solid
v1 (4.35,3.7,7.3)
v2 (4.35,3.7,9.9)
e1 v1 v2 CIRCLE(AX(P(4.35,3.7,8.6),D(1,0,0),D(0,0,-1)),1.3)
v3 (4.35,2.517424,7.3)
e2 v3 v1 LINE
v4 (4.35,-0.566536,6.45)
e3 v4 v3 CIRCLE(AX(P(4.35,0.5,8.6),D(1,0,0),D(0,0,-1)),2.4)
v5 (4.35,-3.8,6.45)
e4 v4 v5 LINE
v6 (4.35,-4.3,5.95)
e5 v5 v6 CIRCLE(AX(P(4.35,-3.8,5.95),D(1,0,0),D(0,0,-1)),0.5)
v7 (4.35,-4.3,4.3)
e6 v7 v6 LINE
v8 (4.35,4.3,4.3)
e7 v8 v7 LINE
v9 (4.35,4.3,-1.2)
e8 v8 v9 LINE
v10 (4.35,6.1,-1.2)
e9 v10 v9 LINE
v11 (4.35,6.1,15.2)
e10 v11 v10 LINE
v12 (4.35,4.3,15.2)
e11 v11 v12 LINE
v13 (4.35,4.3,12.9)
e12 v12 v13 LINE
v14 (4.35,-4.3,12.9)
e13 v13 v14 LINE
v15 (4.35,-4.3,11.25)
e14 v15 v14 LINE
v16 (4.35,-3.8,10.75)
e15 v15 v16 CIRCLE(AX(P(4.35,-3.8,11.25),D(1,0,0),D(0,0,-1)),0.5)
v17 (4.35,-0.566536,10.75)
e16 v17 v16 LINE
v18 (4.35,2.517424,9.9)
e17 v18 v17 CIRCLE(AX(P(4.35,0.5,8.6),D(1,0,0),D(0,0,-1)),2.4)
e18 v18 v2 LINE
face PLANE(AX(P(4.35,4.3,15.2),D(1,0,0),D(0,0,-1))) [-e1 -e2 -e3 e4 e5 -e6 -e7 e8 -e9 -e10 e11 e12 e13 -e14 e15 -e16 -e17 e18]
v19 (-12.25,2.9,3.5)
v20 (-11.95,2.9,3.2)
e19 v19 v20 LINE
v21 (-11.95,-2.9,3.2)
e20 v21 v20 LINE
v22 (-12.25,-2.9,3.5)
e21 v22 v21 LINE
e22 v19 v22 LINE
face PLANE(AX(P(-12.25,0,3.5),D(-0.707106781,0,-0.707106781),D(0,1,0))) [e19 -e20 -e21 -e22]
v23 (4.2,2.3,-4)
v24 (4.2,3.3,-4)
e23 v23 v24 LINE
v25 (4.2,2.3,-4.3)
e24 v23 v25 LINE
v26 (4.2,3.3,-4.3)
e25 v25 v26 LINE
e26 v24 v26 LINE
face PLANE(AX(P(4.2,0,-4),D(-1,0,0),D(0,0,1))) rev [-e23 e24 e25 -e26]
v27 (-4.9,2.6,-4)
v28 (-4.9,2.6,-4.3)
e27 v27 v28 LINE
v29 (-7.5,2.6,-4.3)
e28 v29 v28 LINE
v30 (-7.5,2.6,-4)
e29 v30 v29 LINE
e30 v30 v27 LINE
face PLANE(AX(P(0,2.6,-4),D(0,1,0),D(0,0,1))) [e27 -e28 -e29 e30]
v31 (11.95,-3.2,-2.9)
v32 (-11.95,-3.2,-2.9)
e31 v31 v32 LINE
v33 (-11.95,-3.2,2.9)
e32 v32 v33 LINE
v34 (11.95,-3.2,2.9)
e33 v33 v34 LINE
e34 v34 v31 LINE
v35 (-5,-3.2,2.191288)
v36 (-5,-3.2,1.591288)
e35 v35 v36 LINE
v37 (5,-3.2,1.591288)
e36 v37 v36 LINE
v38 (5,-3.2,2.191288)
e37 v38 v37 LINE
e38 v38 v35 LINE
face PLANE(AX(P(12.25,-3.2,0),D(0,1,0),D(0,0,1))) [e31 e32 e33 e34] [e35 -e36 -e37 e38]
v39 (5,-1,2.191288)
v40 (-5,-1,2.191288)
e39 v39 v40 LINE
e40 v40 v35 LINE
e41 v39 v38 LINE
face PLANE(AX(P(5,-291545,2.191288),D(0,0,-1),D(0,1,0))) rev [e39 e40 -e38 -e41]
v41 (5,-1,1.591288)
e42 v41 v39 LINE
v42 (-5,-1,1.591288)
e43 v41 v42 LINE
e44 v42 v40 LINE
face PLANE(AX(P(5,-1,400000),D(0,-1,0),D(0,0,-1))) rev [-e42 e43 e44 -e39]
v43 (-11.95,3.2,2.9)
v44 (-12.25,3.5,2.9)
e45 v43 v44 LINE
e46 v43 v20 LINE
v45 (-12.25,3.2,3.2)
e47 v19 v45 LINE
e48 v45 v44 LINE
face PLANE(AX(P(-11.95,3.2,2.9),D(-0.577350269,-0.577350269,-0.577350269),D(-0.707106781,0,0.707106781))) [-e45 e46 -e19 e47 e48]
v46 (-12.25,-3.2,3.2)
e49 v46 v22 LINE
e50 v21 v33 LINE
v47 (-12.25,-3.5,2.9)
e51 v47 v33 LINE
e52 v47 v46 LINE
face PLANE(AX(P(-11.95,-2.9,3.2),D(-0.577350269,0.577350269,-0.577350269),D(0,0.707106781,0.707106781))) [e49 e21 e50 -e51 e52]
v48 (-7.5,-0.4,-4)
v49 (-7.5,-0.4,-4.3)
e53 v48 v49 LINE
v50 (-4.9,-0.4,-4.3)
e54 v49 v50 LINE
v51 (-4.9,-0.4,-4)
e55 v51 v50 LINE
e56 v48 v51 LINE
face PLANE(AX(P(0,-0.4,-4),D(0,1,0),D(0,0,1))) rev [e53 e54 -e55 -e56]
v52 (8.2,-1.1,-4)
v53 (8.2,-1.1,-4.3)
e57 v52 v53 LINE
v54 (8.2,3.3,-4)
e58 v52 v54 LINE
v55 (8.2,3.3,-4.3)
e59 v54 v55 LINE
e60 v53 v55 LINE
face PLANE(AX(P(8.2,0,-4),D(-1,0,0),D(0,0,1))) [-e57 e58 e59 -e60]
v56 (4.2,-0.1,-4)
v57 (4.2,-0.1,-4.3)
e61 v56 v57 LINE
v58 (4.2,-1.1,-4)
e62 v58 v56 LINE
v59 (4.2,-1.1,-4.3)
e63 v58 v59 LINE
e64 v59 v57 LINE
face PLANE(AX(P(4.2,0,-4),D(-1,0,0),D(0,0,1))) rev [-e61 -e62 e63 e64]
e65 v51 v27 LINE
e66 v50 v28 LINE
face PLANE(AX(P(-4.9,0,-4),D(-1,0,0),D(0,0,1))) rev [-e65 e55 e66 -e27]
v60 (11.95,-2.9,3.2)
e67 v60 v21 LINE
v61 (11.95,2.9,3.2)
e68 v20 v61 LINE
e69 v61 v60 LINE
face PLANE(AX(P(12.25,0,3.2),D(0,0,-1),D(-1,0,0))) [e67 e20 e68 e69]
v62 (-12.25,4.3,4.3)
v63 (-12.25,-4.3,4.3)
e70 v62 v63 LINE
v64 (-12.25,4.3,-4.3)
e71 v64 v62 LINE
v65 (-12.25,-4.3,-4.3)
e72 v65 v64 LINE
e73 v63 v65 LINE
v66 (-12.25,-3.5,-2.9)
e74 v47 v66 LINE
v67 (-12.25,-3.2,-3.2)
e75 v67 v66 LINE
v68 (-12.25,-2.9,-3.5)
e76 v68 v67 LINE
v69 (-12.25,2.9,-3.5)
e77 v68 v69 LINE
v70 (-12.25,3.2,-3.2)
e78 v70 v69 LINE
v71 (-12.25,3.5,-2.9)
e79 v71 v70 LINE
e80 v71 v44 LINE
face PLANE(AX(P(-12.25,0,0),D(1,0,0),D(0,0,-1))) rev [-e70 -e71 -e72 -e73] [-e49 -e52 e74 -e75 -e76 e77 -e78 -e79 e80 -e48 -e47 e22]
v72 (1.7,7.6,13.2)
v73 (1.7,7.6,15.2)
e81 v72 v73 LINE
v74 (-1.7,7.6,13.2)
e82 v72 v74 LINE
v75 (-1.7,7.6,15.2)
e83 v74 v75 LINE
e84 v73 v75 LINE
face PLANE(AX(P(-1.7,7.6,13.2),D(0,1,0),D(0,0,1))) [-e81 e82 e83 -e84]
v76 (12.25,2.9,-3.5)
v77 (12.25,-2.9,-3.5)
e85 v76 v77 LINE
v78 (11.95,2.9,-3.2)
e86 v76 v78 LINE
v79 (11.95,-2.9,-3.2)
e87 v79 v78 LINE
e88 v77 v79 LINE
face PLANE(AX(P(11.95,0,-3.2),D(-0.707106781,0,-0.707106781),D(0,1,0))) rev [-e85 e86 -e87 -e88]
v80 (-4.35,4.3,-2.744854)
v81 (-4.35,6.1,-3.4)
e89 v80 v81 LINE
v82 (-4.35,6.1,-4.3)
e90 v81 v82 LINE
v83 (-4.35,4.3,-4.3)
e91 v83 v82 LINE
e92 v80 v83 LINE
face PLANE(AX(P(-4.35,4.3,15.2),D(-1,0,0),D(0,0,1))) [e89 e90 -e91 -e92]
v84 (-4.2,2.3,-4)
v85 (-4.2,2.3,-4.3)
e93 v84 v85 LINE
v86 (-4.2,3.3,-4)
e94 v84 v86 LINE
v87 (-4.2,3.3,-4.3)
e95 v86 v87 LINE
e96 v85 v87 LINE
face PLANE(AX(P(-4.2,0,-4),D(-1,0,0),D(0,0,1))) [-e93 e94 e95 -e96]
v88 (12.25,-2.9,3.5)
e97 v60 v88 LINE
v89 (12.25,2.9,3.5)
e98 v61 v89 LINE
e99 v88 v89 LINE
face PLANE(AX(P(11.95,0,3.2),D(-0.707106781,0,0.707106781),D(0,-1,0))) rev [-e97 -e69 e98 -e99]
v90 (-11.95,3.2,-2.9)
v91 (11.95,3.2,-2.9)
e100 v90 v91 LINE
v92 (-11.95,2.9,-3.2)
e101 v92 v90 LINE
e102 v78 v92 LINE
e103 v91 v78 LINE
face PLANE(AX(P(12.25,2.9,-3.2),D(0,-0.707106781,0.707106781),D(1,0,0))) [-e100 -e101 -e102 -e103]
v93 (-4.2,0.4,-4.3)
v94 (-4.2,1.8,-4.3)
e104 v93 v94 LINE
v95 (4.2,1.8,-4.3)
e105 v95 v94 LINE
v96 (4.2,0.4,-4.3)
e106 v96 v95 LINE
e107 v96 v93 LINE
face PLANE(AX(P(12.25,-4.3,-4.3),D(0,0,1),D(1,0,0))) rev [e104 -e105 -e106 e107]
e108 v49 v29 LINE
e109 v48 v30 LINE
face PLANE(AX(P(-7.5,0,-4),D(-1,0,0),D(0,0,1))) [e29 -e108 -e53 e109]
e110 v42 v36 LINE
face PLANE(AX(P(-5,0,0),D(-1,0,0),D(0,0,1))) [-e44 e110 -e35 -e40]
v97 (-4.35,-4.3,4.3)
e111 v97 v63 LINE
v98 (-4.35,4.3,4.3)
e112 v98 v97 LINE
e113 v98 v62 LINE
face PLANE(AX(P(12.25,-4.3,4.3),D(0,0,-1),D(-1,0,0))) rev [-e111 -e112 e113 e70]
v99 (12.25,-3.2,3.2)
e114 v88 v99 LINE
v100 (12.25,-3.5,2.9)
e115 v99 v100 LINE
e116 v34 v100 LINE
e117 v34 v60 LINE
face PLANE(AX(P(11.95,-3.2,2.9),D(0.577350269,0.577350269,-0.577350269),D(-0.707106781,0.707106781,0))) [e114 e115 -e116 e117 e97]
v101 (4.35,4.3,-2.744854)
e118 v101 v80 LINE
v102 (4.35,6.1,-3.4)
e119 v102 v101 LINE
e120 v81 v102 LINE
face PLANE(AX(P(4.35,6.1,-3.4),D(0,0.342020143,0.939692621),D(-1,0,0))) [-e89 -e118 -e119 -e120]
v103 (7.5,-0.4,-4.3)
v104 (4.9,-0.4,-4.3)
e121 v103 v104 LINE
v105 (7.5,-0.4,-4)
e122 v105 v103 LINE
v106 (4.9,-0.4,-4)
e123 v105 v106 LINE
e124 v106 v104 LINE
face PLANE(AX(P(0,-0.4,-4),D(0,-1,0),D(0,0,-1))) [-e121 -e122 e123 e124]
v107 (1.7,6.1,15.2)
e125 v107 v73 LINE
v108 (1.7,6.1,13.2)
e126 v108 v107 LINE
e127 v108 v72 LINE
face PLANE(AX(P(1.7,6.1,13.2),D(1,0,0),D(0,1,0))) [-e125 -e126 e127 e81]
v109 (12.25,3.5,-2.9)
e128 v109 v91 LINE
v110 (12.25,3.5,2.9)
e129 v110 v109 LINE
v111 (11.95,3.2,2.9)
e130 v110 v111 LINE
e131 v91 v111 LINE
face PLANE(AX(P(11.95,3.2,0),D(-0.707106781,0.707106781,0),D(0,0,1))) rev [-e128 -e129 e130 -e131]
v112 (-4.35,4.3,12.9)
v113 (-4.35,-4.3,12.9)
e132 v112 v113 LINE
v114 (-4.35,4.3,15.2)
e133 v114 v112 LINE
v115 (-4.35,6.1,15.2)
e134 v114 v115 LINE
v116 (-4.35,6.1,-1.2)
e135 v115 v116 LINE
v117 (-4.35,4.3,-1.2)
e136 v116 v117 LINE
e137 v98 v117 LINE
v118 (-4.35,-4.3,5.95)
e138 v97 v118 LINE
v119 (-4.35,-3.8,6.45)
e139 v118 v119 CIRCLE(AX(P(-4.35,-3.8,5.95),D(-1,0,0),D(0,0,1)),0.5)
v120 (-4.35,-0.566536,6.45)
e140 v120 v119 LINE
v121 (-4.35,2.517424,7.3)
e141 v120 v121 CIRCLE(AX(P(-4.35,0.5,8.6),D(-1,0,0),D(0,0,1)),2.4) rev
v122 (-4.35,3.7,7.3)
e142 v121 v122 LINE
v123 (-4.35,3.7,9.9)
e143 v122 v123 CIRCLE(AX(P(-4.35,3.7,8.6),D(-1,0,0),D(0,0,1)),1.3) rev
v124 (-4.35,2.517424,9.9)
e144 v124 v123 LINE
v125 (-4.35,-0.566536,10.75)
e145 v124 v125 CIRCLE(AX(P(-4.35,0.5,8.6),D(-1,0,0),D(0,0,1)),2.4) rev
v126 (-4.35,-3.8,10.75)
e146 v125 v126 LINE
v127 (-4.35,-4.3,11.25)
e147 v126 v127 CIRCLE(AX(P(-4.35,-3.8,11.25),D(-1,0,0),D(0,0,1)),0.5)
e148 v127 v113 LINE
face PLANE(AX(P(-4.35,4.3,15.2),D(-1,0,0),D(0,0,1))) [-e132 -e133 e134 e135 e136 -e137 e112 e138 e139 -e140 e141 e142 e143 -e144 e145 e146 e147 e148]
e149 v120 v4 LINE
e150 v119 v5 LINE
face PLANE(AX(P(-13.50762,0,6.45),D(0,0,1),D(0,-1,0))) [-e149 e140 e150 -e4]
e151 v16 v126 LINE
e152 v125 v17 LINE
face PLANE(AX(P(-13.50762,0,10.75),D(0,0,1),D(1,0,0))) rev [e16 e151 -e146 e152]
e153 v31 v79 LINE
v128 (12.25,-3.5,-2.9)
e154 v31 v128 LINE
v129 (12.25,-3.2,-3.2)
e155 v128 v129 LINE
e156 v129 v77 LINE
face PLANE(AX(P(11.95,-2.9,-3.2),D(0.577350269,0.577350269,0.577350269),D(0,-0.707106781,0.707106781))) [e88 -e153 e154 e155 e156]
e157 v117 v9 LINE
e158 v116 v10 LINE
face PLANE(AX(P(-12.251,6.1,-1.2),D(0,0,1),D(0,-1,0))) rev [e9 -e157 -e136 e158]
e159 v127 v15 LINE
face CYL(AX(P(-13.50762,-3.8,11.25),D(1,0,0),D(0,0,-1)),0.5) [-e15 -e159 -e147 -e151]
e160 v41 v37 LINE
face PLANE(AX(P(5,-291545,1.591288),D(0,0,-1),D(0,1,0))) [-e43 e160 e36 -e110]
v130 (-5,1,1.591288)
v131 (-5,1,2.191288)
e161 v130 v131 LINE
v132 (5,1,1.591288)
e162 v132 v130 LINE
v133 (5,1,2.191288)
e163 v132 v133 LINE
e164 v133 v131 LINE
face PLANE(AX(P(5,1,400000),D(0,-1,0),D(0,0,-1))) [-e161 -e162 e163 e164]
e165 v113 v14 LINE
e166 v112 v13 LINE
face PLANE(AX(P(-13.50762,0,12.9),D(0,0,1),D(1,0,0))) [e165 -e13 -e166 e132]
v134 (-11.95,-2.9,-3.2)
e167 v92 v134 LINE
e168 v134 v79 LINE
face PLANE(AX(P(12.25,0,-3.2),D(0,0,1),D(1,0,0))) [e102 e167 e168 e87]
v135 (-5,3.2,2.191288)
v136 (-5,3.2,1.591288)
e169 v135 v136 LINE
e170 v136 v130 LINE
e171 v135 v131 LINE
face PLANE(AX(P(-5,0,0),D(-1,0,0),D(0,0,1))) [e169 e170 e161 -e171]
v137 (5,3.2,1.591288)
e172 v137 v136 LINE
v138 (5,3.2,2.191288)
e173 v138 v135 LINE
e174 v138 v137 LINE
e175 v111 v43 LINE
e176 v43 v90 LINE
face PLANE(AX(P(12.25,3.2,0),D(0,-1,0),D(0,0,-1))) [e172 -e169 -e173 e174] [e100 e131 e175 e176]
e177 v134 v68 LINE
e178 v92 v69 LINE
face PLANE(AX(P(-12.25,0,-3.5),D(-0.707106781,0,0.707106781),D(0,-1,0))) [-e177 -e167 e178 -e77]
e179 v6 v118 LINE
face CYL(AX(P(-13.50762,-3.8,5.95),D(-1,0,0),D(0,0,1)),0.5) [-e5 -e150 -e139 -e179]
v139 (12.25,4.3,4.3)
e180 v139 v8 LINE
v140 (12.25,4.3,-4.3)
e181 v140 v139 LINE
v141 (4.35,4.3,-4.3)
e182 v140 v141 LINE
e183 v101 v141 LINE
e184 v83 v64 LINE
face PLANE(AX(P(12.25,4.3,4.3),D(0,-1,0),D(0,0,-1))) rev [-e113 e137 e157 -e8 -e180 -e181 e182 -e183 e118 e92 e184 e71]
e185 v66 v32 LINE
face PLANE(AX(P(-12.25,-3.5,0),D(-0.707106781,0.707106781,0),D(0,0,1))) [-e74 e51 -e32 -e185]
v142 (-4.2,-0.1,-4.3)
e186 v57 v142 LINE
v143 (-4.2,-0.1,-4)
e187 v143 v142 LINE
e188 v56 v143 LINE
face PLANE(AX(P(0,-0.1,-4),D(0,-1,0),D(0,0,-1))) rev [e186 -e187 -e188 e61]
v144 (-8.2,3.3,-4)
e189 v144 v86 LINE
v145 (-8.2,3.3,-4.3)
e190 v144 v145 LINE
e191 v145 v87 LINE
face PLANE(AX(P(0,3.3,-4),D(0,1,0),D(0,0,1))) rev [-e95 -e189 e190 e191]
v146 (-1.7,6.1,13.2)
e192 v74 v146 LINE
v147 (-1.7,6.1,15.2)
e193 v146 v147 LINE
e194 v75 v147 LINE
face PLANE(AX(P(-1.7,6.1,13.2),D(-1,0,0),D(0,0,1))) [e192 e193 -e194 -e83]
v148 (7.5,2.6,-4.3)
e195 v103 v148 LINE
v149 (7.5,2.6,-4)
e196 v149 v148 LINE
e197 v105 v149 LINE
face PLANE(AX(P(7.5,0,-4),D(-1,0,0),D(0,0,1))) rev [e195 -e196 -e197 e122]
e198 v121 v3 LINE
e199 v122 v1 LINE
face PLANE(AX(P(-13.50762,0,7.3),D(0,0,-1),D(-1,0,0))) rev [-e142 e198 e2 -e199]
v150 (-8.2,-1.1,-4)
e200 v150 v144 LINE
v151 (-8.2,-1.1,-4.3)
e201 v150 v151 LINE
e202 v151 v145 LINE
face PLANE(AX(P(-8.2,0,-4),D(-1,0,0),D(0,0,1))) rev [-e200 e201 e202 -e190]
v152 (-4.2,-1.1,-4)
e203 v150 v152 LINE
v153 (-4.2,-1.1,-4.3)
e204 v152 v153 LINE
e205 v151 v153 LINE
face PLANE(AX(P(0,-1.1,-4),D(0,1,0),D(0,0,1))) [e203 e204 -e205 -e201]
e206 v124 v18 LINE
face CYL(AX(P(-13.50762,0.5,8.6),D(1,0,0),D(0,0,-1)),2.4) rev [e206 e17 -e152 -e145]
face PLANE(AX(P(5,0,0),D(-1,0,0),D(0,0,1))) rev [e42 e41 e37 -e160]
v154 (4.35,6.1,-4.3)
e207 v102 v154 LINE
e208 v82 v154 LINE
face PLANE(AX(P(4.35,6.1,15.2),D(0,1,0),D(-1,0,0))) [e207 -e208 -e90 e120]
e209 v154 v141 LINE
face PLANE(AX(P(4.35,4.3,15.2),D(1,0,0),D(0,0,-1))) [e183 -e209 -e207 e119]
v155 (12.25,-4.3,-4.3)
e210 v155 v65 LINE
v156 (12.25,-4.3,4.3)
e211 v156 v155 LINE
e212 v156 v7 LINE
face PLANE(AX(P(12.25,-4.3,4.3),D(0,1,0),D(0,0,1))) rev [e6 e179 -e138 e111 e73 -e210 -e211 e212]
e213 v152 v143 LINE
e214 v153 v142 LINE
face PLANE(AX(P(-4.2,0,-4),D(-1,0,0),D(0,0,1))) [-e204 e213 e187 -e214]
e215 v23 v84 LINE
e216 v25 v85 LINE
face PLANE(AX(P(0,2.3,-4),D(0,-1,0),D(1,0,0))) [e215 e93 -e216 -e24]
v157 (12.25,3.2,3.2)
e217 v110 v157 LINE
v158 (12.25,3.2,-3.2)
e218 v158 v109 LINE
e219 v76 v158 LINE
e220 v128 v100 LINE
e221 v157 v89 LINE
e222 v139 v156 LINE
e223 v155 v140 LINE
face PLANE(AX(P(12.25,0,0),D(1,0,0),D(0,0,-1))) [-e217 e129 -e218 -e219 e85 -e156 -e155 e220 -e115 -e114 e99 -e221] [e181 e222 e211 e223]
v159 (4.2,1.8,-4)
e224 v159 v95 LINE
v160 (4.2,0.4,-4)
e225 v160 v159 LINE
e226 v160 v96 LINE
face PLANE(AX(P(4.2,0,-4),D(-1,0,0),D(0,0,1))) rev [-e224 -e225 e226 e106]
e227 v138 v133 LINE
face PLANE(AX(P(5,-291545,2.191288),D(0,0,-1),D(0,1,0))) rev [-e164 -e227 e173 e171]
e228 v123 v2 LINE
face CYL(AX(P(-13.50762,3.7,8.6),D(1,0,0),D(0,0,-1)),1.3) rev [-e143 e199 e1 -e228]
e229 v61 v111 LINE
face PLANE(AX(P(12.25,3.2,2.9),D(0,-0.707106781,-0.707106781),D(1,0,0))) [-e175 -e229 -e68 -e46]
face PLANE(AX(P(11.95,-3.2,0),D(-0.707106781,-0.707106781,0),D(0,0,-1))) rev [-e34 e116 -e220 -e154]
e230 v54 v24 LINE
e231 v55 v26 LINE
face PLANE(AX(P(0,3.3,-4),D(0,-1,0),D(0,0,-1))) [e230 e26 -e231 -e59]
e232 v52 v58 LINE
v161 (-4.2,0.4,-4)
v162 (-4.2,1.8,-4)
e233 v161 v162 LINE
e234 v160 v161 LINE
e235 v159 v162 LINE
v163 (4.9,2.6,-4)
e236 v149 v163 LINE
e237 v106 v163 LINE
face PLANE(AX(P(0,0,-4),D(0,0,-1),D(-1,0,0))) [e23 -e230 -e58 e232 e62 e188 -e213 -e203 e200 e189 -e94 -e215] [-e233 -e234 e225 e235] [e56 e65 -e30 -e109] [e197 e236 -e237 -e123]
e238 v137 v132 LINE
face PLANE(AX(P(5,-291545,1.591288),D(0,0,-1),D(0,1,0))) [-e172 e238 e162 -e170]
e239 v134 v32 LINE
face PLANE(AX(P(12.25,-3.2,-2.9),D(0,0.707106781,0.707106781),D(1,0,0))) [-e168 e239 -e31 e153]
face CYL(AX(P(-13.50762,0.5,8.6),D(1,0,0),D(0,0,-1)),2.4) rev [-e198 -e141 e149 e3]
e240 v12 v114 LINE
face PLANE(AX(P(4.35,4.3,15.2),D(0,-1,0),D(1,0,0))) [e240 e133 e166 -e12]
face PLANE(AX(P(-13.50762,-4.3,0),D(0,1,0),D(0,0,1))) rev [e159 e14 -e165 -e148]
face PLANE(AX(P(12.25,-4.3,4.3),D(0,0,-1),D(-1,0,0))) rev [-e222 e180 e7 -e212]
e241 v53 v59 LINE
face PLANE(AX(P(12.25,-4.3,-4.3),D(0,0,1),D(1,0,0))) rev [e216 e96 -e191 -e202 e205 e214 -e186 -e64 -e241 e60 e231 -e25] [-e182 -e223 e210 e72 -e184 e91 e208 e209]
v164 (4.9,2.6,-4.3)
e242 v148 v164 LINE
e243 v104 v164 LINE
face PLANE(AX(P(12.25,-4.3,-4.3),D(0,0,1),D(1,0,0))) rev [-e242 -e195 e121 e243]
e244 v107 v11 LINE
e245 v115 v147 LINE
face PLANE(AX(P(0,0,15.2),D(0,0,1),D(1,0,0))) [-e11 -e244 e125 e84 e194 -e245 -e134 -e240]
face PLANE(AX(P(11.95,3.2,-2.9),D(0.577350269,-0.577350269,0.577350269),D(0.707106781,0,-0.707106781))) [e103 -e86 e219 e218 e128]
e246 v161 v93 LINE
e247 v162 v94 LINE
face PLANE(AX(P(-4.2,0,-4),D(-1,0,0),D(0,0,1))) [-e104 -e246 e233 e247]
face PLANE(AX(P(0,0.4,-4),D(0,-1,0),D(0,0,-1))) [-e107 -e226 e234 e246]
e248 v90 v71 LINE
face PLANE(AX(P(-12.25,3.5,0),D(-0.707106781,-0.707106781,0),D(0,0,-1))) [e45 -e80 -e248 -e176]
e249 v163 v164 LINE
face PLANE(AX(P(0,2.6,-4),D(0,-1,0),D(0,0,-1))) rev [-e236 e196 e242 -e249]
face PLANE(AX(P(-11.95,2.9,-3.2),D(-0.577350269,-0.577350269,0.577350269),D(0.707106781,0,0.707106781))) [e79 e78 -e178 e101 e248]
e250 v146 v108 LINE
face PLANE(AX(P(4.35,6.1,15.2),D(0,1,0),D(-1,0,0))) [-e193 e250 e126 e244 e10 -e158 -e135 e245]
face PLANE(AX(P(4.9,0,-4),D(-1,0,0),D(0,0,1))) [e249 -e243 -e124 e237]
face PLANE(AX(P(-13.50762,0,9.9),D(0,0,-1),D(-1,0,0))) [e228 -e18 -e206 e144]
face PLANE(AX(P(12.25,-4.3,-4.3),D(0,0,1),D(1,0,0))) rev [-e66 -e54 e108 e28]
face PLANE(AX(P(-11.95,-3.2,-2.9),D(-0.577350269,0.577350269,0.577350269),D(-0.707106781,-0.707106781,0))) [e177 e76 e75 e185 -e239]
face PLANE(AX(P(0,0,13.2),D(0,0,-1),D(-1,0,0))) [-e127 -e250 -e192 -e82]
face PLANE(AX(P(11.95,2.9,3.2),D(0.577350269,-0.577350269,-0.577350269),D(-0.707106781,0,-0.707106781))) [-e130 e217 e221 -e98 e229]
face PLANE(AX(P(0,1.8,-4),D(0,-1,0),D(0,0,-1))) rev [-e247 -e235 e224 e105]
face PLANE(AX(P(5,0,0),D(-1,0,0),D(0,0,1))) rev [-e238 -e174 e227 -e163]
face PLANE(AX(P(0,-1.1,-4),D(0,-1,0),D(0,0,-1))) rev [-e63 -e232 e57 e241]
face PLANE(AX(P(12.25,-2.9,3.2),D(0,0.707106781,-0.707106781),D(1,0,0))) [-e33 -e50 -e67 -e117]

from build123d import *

# Parameters (mm, degrees)
SKETCH2_W           = 8.6
SKETCH2_H           = 8.6
SKETCH2_W_2         = 6.4
SKETCH2_H_2         = 6.4
EXTRUDE_THIN1_DEPTH = 12.25
CHAMFER1_SIZE       = 0.3
BOSS_EXTRUDE1_START = -12.25
SKETCH3_W           = 0.6
SKETCH3_H           = 2.2
BOSS_EXTRUDE1_DEPTH = 5
SKETCH4_W           = 8.7
SKETCH4_H           = 1.8
BOSS_EXTRUDE2_DEPTH = 19.5
CUT_EXTRUDE1_REACH  = 25.32
SKETCH5_W           = 1.5
SKETCH5_H           = 1.8
CHAMFER2_SIZE       = 0.7
CHAMFER2_SIZE_2     = 1.923234194
SKETCH6_W           = 3.4
SKETCH6_H           = 1.5
BOSS_EXTRUDE3_DEPTH = 2
BOSS_EXTRUDE4_DEPTH = 8.7
CUT_EXTRUDE2_REACH  = 25.756
FILLET1_R           = 0.5
SKETCH8_W           = 4
SKETCH8_H           = 4.4
SKETCH8_W_2         = 2.6
SKETCH8_H_2         = 3
SKETCH8_W_3         = 8.4
SKETCH8_H_3         = 0.5
CUT_EXTRUDE3_DEPTH  = 0.3


with BuildPart() as part:
    # Sketch2 → Extrude-Thin1 (new, symmetric)
    with BuildSketch(Plane(origin=(0, 0, 0), x_dir=(0, 0, -1), z_dir=(1, 0, 0))):
        Rectangle(SKETCH2_W, SKETCH2_H)
        Rectangle(SKETCH2_W_2, SKETCH2_H_2, mode=Mode.SUBTRACT)
    extrude(amount=EXTRUDE_THIN1_DEPTH, both=True)

    # Chamfer1
    chamfer1_edges = [part.edges().sort_by_distance(p)[0] for p in [
        (-12.25, 0, -3.2),
        (0, -3.2, -3.2),
        (-12.25, 3.2, 0),
        (0, 3.2, -3.2),
        (-12.25, 0, 3.2),
        (0, 3.2, 3.2),
        (-12.25, -3.2, 0),
        (0, -3.2, 3.2),
        (12.25, 0, -3.2),
        (12.25, 3.2, 0),
        (12.25, 0, 3.2),
        (12.25, -3.2, 0),
    ]]
    chamfer(chamfer1_edges, length=CHAMFER1_SIZE)

    # Sketch3 → Boss-Extrude1 (add, symmetric)
    with BuildSketch(Plane(origin=(12.25, 0, 0), x_dir=(0, 0, -1), z_dir=(1, 0, 0)).offset(BOSS_EXTRUDE1_START)):
        with Locations((-1.891287847, 2.1)):
            Rectangle(SKETCH3_W, SKETCH3_H)
        with Locations((-1.891287847, -2.1)):
            Rectangle(SKETCH3_W, SKETCH3_H)
    extrude(amount=BOSS_EXTRUDE1_DEPTH, both=True)

    # Sketch4 → Boss-Extrude2 (add)
    with BuildSketch(Plane(origin=(0, 0, -4.3), x_dir=(-1, 0, 0), z_dir=(0, 0, -1))):
        with Locations((0, 5.2)):
            Rectangle(SKETCH4_W, SKETCH4_H)
    extrude(amount=-BOSS_EXTRUDE2_DEPTH)

    # Sketch5 → Cut-Extrude1 (cut, up to next)
    with BuildSketch(Plane(origin=(4.35, 0, 0), x_dir=(0, 0, -1), z_dir=(1, 0, 0)), mode=Mode.PRIVATE) as cut_extrude1_sk1:
        with Locations((1.95, 5.2)):
            Rectangle(SKETCH5_W, SKETCH5_H)
    cut_extrude1_tool1 = extrude(cut_extrude1_sk1.sketch, amount=-CUT_EXTRUDE1_REACH, mode=Mode.PRIVATE) & part.part
    add(cut_extrude1_tool1.solids().sort_by_distance((4.35, 5.2, -1.95))[0], mode=Mode.SUBTRACT)

    # Chamfer2
    # the kernel refuses this chamfer: 1.923234194, 0.7 mm, written as the material it takes off along each edge
    with BuildSketch(Plane(origin=(9.339244015, 6.1, -2.7), x_dir=(0, 0.09904090225205073, -0.9950833631817486), z_dir=(-1, 0, 0))) as chamfer2_piece_1_section:
        Polygon((CHAMFER2_SIZE * 0.995083363182, CHAMFER2_SIZE * 0.0990409022521), (-CHAMFER2_SIZE_2 * 0.0990409022324, CHAMFER2_SIZE_2 * 0.995083362984), (0, 0), align=None)
    chamfer2_piece_1 = extrude(amount=18.678488029, mode=Mode.PRIVATE)
    chamfer2_piece_1 = split(chamfer2_piece_1, bisect_by=Plane(origin=(0, 4.3, -2.919451718), z_dir=(0, 1, 0)), keep=Keep.TOP, mode=Mode.PRIVATE)
    add(chamfer2_piece_1, mode=Mode.SUBTRACT)

    # Sketch6 → Boss-Extrude3 (add)
    with BuildSketch(Plane.XY.offset(15.2)):
        with Locations((0, 6.85)):
            Rectangle(SKETCH6_W, SKETCH6_H)
    extrude(amount=-BOSS_EXTRUDE3_DEPTH)

    # Sketch7 → Boss-Extrude4 (add)
    with BuildSketch(Plane(origin=(4.35, 0, 0), x_dir=(0, 0, -1), z_dir=(1, 0, 0))):
        with BuildLine():
            ThreePointArc((-9.9, 3.7), (-9.862781283, 4.008842082), (-9.753256259, 4.3))
            Line((-9.753256259, 4.3), (-12.9, 4.3))
            Line((-12.9, 4.3), (-12.9, -4.3))
            Line((-12.9, -4.3), (-10.75, -4.3))
            Line((-10.75, -4.3), (-10.75, -0.56653645))
            ThreePointArc((-10.75, -0.56653645), (-10.913726036, 1.137708265), (-9.9, 2.5174241))
            Line((-9.9, 2.5174241), (-9.9, 3.7))
        make_face()
        with BuildLine():
            Line((-4.3, -4.3), (-4.3, 4.3))
            Line((-4.3, 4.3), (-7.446743741, 4.3))
            ThreePointArc((-7.446743741, 4.3), (-7.337218717, 4.008842082), (-7.3, 3.7))
            Line((-7.3, 3.7), (-7.3, 2.5174241))
            ThreePointArc((-7.3, 2.5174241), (-6.492869249, 1.648912529), (-6.2, 0.5))
            ThreePointArc((-6.2, 0.5), (-6.263335711, -0.047722558), (-6.45, -0.56653645))
            Line((-6.45, -0.56653645), (-6.45, -4.3))
            Line((-6.45, -4.3), (-4.3, -4.3))
        make_face()
    extrude(amount=-BOSS_EXTRUDE4_DEPTH)

    # Sketch7<3> → Cut-Extrude2 (cut, up to next)
    with BuildSketch(Plane(origin=(4.35, 0, 0), x_dir=(0, 0, -1), z_dir=(1, 0, 0)), mode=Mode.PRIVATE) as cut_extrude2_sk1:
        with BuildLine():
            Line((-9.753256259, 4.3), (-7.446743741, 4.3))
            ThreePointArc((-7.446743741, 4.3), (-8.6, 5), (-9.753256259, 4.3))
        make_face()
    cut_extrude2_tool1 = extrude(cut_extrude2_sk1.sketch, amount=-CUT_EXTRUDE2_REACH, mode=Mode.PRIVATE) & part.part
    add(cut_extrude2_tool1.solids().sort_by_distance((4.35, 4.587672, 8.6))[0], mode=Mode.SUBTRACT)

    # Fillet1
    fillet1_edges = [part.edges().sort_by_distance(p)[0] for p in [
        (0, -4.3, 10.75),
        (0, -4.3, 6.45),
    ]]
    fillet(fillet1_edges, radius=FILLET1_R)

    # Sketch8 → Cut-Extrude3 (cut)
    # profile 1 of 4: a face of its own
    with BuildSketch(Plane(origin=(0, 0, -4.3), x_dir=(-1, 0, 0), z_dir=(0, 0, -1))):
        with Locations((-6.2, 1.1)):
            Rectangle(SKETCH8_W, SKETCH8_H)
        with Locations((-6.2, 1.1)):
            Rectangle(SKETCH8_W_2, SKETCH8_H_2, mode=Mode.SUBTRACT)
    # profile 2 of 4: a face of its own
    with BuildSketch(Plane(origin=(0, 0, -4.3), x_dir=(-1, 0, 0), z_dir=(0, 0, -1))):
        with Locations((0, 2.05)):
            Rectangle(SKETCH8_W_3, SKETCH8_H_3)
    # profile 3 of 4: a face of its own
    with BuildSketch(Plane(origin=(0, 0, -4.3), x_dir=(-1, 0, 0), z_dir=(0, 0, -1))):
        with Locations((0, 0.15)):
            Rectangle(SKETCH8_W_3, SKETCH8_H_3)
    # profile 4 of 4: a face of its own
    with BuildSketch(Plane(origin=(0, 0, -4.3), x_dir=(-1, 0, 0), z_dir=(0, 0, -1))):
        with Locations((6.2, 1.1)):
            Rectangle(SKETCH8_W, SKETCH8_H)
        with Locations((6.2, 1.1)):
            Rectangle(SKETCH8_W_2, SKETCH8_H_2, mode=Mode.SUBTRACT)
    extrude(amount=-CUT_EXTRUDE3_DEPTH, mode=Mode.SUBTRACT)


solid = part.part
